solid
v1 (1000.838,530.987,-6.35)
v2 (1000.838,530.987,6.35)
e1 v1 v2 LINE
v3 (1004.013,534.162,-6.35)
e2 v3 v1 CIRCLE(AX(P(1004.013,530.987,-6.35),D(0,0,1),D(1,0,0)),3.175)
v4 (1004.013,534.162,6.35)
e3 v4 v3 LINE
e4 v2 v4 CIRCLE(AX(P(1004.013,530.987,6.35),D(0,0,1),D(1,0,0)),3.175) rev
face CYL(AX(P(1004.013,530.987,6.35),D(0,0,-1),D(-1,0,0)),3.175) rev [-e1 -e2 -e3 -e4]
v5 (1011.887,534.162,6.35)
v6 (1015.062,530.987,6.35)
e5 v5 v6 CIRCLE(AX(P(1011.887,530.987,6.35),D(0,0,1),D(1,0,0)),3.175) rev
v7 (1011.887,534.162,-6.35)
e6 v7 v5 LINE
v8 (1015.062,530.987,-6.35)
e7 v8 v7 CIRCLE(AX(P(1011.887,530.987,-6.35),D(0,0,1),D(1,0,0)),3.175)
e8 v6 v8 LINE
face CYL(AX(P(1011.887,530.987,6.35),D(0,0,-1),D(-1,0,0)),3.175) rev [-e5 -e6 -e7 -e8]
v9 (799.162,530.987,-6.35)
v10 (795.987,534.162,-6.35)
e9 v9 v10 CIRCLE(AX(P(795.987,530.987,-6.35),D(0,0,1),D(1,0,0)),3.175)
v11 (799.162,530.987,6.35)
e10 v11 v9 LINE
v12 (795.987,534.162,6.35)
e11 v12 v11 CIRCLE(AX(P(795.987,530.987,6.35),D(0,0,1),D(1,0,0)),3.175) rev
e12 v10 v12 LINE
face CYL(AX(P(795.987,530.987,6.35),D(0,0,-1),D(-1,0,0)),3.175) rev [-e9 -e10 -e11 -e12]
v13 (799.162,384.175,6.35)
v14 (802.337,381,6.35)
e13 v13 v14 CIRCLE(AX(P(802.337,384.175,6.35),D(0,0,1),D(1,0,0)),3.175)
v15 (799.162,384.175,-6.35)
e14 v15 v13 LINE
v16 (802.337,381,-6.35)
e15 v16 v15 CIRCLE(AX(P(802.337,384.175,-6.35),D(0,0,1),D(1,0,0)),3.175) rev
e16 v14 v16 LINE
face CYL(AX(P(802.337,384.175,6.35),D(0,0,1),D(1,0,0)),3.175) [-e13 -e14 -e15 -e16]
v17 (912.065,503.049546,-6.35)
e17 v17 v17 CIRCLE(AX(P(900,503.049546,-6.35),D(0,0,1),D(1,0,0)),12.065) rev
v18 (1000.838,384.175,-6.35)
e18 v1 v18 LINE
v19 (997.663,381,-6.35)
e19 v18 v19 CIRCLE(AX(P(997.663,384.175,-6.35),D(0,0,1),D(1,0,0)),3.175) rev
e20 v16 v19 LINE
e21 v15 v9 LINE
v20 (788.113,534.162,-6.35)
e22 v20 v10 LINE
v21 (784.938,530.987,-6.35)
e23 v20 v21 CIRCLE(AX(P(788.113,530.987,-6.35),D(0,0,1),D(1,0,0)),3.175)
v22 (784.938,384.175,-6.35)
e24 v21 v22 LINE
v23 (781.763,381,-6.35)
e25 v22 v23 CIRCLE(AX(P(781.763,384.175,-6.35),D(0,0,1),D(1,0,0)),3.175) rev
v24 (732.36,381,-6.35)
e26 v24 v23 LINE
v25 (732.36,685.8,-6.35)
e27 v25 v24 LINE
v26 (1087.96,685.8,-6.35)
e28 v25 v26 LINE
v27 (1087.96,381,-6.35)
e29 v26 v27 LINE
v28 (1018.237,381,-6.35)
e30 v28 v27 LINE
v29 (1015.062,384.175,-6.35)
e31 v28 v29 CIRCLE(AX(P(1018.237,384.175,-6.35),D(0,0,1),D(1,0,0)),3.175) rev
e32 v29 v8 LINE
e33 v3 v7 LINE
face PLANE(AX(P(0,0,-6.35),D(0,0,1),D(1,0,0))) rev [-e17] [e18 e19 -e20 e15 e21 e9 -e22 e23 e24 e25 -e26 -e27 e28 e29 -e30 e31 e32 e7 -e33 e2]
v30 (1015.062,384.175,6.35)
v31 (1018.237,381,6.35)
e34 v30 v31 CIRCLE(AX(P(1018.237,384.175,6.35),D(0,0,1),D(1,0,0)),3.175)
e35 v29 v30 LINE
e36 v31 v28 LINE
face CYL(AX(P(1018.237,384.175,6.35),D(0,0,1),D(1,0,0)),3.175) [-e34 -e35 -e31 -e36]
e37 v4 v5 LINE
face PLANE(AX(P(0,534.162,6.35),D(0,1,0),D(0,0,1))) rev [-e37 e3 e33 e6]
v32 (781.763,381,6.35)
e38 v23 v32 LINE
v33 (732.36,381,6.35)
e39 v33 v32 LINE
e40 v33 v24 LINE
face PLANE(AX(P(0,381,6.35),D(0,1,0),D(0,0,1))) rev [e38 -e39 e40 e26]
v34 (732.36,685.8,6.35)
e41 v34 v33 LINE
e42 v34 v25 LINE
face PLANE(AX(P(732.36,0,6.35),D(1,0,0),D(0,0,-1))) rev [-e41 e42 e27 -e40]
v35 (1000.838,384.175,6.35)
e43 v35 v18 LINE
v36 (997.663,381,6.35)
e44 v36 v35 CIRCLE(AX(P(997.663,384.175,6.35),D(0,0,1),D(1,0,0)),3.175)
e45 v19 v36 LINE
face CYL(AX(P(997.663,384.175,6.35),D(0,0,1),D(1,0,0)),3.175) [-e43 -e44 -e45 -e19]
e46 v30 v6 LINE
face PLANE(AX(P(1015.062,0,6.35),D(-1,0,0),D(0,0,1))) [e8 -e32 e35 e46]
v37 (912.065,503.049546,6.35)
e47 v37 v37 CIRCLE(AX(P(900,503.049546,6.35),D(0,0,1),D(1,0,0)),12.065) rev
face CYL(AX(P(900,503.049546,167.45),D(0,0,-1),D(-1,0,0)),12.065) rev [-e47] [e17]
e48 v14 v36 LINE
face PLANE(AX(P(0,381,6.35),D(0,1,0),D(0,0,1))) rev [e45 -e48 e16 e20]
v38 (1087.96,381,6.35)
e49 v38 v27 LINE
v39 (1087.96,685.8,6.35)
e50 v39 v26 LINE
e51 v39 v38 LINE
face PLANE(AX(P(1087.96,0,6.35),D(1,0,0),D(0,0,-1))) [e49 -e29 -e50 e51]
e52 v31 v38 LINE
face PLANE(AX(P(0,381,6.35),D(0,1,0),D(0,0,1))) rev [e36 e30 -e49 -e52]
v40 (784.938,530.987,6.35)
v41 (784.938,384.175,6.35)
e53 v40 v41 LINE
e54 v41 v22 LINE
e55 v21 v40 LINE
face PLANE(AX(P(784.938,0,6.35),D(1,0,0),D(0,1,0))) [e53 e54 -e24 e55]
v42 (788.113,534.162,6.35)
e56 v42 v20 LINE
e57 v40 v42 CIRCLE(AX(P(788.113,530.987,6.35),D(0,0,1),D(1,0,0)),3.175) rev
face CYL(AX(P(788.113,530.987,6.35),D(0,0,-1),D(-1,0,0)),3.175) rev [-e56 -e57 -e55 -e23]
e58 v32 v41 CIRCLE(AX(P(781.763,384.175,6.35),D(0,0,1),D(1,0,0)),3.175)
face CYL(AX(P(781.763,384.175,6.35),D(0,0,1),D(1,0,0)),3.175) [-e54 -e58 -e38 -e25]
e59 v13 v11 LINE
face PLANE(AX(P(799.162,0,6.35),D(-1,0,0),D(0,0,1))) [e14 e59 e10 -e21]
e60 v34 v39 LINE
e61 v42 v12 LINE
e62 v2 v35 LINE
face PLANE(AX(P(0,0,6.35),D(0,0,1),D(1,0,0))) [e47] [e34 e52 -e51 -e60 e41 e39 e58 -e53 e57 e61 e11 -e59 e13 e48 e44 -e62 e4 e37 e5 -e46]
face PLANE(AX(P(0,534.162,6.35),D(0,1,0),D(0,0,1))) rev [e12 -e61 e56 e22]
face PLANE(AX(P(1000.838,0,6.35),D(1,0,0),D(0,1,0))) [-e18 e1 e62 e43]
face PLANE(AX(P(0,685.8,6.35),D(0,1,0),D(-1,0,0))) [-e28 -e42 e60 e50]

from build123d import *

# Parameters (mm, degrees)
BOSS_EXTRUDE1_DEPTH = 6.35
CAVITY1_START       = -6.35
CAVITY1_OUTLINE_R   = 12.7
CAVITY1_DEPTH       = 12.7
MOVE_FACE_SLOT_BY   = 0.762
MOVE_FACE_SLOT_2_BY = 0.762
MOVE_FACE_SLOT_3_BY = 0.762
MOVE_FACE_SLOT_4_BY = 0.762
MOVE_FACE_SLOT_5_BY = 0.762
MOVE_FACE_SLOT_6_BY = 0.762
MOVE_FACE_HOLE_BY   = 0.635
SLOT_FILLET_R       = 3.175


# Read off the part's stored shape, not the designer's step: Cavity1
with BuildPart() as part:
    # Sketch1 → Boss-Extrude1 (new, symmetric)
    with BuildSketch(Plane.XY):
        Polygon((785.7, 533.4), (785.7, 381), (732.36, 381), (732.36, 685.8), (785.7, 685.8), (1001.6, 685.8), (1087.96, 685.8), (1087.96, 381), (1014.3, 381), (1014.3, 533.4), (1001.6, 533.4), (1001.6, 381), (798.4, 381), (798.4, 533.4), align=None)
    extrude(amount=BOSS_EXTRUDE1_DEPTH, both=True)

    # Cavity1 outline → Cavity1 (cut)
    with BuildSketch(Plane.XY.offset(CAVITY1_START)):
        with Locations((900, 503.049546279)):
            Circle(CAVITY1_OUTLINE_R)
    extrude(amount=CAVITY1_DEPTH, mode=Mode.SUBTRACT)

    # Move Face Slot: a face moved inward by 0.762
    extrude(part.faces().sort_by_distance((1007.95, 533.4, 0))[0], amount=MOVE_FACE_SLOT_BY, dir=(0, 1, 0), mode=Mode.SUBTRACT)

    # Move Face Slot 2: a face moved inward by 0.762
    extrude(part.faces().sort_by_distance((1014.3, 457.2, 0))[0], amount=MOVE_FACE_SLOT_2_BY, dir=(1, 0, 0), mode=Mode.SUBTRACT)

    # Move Face Slot 3: a face moved inward by 0.762
    extrude(part.faces().sort_by_distance((792.05, 533.4, 0))[0], amount=MOVE_FACE_SLOT_3_BY, dir=(0, 1, 0), mode=Mode.SUBTRACT)

    # Move Face Slot 4: a face moved inward by 0.762
    extrude(part.faces().sort_by_distance((798.4, 457.2, 0))[0], amount=MOVE_FACE_SLOT_4_BY, dir=(1, 0, 0), mode=Mode.SUBTRACT)

    # Move Face Slot 5: a face moved inward by 0.762
    extrude(part.faces().sort_by_distance((785.7, 457.2, 0))[0], amount=MOVE_FACE_SLOT_5_BY, dir=(-1, 0, 0), mode=Mode.SUBTRACT)

    # Move Face Slot 6: a face moved inward by 0.762
    extrude(part.faces().sort_by_distance((1001.6, 457.2, 0))[0], amount=MOVE_FACE_SLOT_6_BY, dir=(-1, 0, 0), mode=Mode.SUBTRACT)

    # Move Face Hole: a curved face moved outward by 0.635
    add(Solid.thicken(part.faces().sort_by_distance((887.3, 503.049546279, 0))[0], MOVE_FACE_HOLE_BY))

    # Slot Fillet
    slot_fillet_edges = [part.edges().sort_by_distance(p)[0] for p in [
        (784.938, 381, 0),
        (784.938, 534.162, 0),
        (799.162, 534.162, 0),
        (799.162, 381, 0),
        (1000.838, 381, 0),
        (1000.838, 534.162, 0),
        (1015.062, 534.162, 0),
        (1015.062, 381, 0),
    ]]
    fillet(slot_fillet_edges, radius=SLOT_FILLET_R)


solid = part.part
